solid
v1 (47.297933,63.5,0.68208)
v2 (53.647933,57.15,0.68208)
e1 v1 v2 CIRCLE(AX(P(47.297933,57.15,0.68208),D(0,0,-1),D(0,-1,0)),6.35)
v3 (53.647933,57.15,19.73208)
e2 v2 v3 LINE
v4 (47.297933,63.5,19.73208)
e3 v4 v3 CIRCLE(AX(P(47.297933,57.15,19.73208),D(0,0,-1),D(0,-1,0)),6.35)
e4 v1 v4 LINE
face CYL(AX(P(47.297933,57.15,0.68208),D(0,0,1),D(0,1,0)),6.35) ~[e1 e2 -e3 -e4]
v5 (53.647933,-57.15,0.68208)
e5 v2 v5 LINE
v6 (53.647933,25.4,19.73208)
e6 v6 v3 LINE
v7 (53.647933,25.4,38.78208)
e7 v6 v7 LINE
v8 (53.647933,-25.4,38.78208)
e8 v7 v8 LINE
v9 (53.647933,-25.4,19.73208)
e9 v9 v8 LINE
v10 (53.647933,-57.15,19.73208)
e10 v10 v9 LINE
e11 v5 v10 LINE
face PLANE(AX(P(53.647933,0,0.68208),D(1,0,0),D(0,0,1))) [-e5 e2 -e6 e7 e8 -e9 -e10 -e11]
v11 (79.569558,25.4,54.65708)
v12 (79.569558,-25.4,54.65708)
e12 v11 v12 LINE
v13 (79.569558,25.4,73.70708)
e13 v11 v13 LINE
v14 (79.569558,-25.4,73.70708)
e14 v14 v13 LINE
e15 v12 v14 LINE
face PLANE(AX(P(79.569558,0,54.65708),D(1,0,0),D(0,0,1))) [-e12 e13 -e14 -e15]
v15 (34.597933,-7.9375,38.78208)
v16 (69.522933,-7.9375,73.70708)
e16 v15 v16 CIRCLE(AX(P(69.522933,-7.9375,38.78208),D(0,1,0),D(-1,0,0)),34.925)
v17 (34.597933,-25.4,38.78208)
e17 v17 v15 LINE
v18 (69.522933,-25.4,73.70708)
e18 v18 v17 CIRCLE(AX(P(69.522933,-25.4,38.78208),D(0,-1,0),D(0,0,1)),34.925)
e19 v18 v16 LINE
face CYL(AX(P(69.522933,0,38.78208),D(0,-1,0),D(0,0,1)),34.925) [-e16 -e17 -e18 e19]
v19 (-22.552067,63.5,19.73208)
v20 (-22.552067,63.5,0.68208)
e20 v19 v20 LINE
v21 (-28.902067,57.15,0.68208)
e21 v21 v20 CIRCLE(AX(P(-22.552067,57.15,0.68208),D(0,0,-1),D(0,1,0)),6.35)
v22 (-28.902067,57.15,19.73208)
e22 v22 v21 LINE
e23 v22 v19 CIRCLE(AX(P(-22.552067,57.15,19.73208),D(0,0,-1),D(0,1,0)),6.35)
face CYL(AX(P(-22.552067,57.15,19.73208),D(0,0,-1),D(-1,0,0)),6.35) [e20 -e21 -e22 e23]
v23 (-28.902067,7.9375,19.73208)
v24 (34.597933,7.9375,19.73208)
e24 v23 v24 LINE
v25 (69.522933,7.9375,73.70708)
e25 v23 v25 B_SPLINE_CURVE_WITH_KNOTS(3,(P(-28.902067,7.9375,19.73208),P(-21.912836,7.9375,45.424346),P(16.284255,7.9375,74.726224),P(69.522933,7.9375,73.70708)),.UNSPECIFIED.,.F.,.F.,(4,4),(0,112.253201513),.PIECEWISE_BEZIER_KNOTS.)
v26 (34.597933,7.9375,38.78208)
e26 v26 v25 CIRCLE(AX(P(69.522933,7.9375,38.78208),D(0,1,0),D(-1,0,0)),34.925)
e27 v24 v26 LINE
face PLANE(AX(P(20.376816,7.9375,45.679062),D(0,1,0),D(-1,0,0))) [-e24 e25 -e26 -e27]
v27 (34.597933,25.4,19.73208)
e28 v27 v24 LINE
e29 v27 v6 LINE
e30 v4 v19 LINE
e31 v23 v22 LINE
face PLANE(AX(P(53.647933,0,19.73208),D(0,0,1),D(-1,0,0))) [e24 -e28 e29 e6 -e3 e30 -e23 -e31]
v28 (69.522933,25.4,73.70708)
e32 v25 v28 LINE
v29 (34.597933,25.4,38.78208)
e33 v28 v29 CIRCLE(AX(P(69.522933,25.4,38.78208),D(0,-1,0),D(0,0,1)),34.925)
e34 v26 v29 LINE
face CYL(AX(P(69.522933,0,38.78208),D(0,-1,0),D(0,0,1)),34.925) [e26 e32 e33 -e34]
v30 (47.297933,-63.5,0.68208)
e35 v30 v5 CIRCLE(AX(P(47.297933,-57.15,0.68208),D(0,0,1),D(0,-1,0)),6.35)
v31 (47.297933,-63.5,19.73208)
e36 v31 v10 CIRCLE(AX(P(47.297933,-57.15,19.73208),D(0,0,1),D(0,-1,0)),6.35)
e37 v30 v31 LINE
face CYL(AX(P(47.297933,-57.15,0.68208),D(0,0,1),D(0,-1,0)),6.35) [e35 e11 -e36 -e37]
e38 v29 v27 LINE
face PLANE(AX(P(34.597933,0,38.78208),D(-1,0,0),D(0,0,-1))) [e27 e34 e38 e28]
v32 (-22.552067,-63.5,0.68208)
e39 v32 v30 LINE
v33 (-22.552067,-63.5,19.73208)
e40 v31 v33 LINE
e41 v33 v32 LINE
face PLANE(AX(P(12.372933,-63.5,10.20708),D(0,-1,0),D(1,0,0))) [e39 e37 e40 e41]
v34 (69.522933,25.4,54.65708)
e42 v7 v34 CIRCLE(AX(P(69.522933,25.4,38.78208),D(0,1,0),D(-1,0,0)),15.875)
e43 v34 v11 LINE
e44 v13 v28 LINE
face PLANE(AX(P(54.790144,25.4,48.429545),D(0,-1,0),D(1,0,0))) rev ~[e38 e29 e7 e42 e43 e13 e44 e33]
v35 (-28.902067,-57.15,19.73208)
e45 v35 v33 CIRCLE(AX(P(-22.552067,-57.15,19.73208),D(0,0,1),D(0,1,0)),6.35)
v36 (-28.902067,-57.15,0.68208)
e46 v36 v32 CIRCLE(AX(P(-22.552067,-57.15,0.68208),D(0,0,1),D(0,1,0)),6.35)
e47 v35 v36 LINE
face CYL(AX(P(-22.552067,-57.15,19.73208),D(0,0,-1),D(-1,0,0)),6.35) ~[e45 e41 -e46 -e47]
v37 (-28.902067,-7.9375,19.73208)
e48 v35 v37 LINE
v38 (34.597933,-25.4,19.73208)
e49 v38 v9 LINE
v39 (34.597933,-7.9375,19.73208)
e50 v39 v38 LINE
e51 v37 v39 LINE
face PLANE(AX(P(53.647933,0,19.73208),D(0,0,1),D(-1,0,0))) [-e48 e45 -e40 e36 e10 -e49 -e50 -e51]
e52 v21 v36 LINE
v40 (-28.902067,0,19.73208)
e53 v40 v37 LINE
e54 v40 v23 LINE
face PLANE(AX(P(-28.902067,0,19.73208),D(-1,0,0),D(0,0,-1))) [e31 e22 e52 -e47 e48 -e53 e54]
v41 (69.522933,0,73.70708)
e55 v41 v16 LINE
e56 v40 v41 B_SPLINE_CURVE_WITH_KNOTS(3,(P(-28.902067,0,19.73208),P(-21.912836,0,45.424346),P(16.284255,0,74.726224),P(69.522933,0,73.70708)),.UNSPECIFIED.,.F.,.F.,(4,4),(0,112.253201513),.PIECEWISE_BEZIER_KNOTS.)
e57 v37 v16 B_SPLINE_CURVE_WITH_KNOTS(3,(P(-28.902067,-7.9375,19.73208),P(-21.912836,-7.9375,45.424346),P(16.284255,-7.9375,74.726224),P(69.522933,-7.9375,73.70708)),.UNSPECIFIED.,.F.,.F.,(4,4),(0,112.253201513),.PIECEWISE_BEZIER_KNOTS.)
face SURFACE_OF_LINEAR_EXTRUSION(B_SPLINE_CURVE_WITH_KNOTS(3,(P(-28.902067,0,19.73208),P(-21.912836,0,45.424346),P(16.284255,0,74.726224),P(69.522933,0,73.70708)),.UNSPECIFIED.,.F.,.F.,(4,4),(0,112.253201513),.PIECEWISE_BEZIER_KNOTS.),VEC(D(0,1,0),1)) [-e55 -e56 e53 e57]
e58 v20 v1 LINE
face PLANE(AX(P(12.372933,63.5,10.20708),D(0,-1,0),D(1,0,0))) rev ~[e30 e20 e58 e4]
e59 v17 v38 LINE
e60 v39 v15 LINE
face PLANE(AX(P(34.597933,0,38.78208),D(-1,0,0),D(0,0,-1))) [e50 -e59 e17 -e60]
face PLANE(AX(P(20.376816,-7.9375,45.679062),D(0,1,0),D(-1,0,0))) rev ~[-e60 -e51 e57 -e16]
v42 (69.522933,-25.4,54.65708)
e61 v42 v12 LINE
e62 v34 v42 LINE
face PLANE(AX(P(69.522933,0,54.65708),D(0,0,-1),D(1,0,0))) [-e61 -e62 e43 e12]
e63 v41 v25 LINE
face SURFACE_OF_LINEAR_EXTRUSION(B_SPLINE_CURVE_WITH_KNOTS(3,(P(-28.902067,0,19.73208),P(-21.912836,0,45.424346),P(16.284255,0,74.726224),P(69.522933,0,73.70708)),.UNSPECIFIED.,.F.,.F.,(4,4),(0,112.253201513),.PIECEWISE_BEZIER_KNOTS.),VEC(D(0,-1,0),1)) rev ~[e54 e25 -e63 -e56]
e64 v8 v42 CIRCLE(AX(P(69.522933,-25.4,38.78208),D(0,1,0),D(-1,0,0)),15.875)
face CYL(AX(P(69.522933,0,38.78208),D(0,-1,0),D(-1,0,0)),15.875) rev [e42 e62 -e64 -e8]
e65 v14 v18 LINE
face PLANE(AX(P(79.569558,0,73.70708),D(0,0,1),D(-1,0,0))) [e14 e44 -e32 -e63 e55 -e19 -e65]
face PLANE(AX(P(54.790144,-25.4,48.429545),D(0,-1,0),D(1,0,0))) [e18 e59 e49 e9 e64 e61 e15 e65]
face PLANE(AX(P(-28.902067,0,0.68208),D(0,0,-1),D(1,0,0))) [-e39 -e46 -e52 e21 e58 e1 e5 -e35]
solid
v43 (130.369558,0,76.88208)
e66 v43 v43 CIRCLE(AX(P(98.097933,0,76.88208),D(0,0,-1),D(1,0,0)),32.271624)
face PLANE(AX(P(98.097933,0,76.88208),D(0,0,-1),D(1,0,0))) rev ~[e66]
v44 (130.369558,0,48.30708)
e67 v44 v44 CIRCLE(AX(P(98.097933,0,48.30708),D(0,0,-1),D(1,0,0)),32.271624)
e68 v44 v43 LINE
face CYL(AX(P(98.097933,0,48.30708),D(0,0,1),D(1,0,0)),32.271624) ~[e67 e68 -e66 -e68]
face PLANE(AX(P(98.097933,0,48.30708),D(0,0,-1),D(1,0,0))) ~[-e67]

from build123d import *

# Parameters (mm, degrees)
F1_DEPTH = 63.5
F2_DEPTH = 25.4
F3_DEPTH = 7.9375
F5_R     = 6.35


# Not quite as in the source:
# - a feature names something its author has since deleted; it is built from what else it names


with BuildPart() as f1:
    # F0 (on Front) → F1 (new body, symmetric)
    with BuildSketch(Plane.XZ):
        Polygon((34.5979332924, 19.7320799329), (-28.9020667076, 19.7320799329), (-28.9020667076, 0.6820799329), (53.6479332924, 0.6820799329), (53.6479332924, 19.7320799329), align=None)
    extrude(amount=F1_DEPTH, both=True)

    # F0 (on Front) → F2 (join, symmetric)
    with BuildSketch(Plane.XZ):
        with BuildLine():
            Line((34.5979332924, 38.7820799329), (34.5979332924, 19.7320799329))
            Line((34.5979332924, 19.7320799329), (53.6479332924, 19.7320799329))
            Line((53.6479332924, 19.7320799329), (53.6479332924, 38.7820799329))
            ThreePointArc((53.6479332924, 38.7820799329), (58.2976131411, 50.0074000842), (69.5229332924, 54.6570799329))
            Line((69.5229332924, 54.6570799329), (79.5695575002, 54.6570799329))
            Line((79.5695575002, 54.6570799329), (79.5695575002, 73.7070799329))
            Line((79.5695575002, 73.7070799329), (69.5229332924, 73.7070799329))
            ThreePointArc((69.5229332924, 73.7070799329), (44.8272289594, 63.4777842658), (34.5979332924, 38.7820799329))
        make_face()
    extrude(amount=F2_DEPTH, both=True)

    # F0 (on Front) → F3 (join, symmetric)
    with BuildSketch(Plane.XZ):
        with BuildLine():
            add(Edge.make_bspline(
                [(-28.9020667076, 19.7320799329), (-21.9128355384, 45.4243458807), (16.2842553109, 74.7262239456), (69.5229332924, 73.7070799329)],
                knots=[0, 0, 0, 0, 112.2532015134, 112.2532015134, 112.2532015134, 112.2532015134], degree=3))
            Line((-28.9020667076, 19.7320799329), (34.5979332924, 19.7320799329))
            Line((34.5979332924, 19.7320799329), (34.5979332924, 38.7820799329))
            ThreePointArc((34.5979332924, 38.7820799329), (44.8272289594, 63.4777842658), (69.5229332924, 73.7070799329))
        make_face()
    extrude(amount=F3_DEPTH, both=True)

    # F5
    f5_edges = [f1.edges().sort_by_distance(p)[0] for p in [
        (-28.902067, -63.5, 10.20708),
        (53.647933, -63.5, 10.20708),
        (-28.902067, 63.5, 10.20708),
        (53.647933, 63.5, 10.20708),
    ]]
    fillet(f5_edges, radius=F5_R)


with BuildPart() as f4:
    # F0 (on Front) → F4 (revolve)
    with BuildSketch(Plane.XZ):
        Polygon((98.0979332924, 76.8820799329), (98.0979332924, 73.7070799329), (98.0979332924, 54.6570799329), (98.0979332924, 48.3070799329), (130.3695575002, 48.3070799329), (130.3695575002, 76.8820799329), align=None)
    revolve(axis=Axis((98.0979332924, 0, 62.5945799329), (0, 0, -1)))


solid = Compound([f1.part, f4.part])
